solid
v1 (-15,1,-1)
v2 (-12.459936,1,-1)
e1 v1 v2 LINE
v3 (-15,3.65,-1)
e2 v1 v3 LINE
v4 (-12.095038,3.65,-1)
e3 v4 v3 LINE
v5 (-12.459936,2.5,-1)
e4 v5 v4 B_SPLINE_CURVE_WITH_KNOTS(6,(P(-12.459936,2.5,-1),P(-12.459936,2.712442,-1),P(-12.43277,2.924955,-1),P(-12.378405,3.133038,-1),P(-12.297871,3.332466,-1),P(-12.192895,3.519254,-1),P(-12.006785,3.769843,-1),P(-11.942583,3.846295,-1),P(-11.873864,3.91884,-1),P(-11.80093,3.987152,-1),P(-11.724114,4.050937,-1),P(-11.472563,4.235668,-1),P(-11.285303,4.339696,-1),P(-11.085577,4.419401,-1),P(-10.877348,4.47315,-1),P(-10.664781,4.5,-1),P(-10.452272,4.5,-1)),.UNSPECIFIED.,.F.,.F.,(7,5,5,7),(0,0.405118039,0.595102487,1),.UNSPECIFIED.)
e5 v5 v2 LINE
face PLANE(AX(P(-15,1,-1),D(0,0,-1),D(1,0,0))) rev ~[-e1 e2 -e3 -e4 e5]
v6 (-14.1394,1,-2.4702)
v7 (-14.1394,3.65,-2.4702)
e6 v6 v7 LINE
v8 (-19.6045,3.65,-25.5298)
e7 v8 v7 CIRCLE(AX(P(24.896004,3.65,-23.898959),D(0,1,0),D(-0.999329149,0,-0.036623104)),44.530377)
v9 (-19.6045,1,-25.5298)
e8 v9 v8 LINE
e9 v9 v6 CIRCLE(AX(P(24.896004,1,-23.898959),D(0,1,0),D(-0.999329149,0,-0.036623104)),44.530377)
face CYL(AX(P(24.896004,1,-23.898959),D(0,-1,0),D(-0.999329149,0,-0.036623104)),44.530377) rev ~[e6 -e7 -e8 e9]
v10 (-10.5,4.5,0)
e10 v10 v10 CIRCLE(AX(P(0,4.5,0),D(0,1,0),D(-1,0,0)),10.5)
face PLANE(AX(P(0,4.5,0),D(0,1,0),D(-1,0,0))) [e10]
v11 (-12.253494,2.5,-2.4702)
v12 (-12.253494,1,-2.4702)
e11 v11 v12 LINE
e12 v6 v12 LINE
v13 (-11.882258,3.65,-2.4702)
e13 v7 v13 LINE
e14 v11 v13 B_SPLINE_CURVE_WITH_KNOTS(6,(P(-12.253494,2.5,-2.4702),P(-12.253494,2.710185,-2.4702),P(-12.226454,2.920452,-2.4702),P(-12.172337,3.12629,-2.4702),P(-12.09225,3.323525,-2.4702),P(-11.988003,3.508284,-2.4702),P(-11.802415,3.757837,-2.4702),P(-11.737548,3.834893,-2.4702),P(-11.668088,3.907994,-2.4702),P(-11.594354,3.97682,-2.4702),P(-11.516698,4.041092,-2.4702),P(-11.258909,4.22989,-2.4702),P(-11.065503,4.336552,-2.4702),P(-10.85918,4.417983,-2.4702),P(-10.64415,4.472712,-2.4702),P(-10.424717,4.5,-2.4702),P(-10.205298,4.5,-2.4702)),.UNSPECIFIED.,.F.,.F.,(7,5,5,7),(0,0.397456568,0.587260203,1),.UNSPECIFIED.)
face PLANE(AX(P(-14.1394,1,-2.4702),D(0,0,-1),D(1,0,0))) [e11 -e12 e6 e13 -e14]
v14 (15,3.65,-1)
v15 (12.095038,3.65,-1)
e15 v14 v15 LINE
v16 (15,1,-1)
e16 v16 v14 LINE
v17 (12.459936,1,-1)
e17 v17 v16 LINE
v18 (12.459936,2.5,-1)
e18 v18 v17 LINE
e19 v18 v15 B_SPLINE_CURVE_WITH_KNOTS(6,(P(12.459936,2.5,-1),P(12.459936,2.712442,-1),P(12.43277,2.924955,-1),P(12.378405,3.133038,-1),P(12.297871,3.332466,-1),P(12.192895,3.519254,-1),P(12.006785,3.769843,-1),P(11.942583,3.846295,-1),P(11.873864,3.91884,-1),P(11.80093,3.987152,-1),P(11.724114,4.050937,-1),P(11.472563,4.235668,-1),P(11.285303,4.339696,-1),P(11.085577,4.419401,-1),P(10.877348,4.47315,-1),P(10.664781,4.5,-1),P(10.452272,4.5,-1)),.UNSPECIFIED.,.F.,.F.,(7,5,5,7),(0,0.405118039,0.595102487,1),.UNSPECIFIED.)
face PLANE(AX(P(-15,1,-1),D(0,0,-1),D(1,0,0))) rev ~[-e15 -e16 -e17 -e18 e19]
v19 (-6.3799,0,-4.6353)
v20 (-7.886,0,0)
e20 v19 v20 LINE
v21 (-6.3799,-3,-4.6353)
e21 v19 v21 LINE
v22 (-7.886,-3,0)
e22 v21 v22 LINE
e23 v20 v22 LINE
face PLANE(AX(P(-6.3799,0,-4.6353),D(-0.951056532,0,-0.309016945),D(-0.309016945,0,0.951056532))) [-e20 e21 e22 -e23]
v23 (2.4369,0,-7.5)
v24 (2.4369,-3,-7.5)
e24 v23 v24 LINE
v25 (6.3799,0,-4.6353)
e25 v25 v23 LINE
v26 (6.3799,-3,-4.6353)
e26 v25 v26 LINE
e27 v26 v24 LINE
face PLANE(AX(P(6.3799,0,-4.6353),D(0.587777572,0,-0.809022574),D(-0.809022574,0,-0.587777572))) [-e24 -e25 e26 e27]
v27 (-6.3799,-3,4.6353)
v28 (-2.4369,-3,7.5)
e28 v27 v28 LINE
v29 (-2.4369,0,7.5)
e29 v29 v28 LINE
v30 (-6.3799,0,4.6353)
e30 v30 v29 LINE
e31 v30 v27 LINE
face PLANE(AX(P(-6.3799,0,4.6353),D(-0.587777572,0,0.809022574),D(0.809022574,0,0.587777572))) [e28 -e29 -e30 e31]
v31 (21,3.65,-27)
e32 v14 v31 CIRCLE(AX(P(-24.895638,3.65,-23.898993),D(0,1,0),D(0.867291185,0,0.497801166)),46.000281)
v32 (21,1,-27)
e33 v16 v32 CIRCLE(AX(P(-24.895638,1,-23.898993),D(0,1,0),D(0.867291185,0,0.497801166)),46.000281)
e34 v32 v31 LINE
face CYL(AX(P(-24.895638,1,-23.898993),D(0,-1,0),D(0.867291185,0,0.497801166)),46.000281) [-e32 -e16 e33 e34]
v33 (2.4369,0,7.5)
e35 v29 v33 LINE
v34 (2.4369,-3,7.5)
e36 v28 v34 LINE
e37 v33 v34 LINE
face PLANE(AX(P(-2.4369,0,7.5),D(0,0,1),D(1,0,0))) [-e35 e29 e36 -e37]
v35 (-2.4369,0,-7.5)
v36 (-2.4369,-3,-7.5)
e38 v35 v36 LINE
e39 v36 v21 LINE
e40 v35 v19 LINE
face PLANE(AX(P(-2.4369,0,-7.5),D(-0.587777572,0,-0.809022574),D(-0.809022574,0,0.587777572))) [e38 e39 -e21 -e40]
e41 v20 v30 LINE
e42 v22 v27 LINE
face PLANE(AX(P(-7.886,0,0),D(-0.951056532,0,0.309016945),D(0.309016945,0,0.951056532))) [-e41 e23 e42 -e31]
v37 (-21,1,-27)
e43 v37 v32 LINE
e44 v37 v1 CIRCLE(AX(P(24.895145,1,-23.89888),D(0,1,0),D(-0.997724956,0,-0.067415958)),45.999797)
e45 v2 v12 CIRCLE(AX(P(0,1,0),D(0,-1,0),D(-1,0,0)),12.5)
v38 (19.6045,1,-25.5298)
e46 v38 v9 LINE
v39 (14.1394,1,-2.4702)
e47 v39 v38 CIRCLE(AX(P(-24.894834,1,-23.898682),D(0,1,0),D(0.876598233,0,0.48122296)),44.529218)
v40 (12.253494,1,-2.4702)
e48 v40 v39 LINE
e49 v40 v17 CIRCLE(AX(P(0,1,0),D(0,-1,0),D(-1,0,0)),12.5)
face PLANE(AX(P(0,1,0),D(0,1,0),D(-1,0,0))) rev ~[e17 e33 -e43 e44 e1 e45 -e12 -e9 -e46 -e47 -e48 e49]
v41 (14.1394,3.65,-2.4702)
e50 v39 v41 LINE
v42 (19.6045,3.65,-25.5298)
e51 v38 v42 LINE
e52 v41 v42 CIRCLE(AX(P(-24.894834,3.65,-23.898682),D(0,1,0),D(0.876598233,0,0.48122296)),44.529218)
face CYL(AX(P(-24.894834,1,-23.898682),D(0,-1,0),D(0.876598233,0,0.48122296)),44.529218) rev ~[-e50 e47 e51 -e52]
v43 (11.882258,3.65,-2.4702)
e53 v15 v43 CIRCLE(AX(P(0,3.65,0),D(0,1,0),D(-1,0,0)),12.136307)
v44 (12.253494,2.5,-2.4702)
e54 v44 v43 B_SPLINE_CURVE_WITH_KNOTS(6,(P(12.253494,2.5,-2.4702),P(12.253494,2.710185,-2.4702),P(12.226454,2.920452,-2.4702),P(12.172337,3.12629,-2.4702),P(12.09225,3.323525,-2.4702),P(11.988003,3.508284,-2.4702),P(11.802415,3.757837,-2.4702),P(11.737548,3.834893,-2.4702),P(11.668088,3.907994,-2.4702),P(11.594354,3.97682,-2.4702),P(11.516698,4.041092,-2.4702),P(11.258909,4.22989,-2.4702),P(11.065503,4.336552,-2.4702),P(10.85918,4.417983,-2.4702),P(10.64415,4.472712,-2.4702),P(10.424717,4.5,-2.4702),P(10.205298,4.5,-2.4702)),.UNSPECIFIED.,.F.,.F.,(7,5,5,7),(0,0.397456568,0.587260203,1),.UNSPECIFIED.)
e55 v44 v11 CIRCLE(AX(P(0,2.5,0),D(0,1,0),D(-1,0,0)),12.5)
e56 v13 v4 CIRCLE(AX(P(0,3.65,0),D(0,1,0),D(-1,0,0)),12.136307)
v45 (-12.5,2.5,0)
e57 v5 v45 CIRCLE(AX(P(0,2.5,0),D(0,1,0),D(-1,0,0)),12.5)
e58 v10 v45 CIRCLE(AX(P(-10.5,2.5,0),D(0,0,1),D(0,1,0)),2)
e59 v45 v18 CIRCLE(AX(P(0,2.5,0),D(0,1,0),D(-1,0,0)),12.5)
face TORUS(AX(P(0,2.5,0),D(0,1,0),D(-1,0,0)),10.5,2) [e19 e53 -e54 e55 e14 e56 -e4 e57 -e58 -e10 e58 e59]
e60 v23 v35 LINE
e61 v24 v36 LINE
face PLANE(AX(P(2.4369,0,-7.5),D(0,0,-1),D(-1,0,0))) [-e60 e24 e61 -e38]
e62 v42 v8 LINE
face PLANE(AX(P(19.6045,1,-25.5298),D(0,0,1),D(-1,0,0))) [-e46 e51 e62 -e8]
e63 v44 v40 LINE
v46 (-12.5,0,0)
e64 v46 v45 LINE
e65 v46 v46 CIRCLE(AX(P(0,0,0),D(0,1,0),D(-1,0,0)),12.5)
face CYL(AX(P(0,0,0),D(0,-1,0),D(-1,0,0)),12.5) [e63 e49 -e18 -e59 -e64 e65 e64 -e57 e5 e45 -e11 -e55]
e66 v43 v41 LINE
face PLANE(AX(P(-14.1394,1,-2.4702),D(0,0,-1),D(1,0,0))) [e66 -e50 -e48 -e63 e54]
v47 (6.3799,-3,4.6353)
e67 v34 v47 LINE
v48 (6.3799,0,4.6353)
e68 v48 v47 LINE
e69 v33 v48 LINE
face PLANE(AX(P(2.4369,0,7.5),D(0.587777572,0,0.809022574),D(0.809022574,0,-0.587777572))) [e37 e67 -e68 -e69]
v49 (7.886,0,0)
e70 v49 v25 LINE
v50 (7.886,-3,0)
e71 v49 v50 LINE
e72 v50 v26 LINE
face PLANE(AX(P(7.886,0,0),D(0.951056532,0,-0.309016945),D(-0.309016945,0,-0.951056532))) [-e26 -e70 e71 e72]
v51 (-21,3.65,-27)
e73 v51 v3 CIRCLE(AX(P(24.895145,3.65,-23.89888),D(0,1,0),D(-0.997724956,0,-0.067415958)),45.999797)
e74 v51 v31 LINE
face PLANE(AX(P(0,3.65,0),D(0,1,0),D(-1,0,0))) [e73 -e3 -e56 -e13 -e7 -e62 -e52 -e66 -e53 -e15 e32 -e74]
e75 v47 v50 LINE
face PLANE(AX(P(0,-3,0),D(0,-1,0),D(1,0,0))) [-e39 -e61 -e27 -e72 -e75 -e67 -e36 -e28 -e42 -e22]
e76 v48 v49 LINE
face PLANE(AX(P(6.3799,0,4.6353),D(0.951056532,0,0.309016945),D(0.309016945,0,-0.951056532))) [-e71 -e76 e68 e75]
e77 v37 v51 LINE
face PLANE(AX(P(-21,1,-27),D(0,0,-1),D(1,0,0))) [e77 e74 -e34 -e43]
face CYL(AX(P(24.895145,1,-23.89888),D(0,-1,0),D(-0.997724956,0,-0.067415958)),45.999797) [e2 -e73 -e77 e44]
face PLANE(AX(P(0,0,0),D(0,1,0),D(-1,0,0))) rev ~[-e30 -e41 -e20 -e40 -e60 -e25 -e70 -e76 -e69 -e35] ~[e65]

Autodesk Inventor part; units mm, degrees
ref_plane "YZ Plane" through (0, 0, 0) normal (1, 0, 0) x (0, 1, 0)
ref_plane "XY Plane" through (0, 0, 0) normal (0, 0, 1) x (1, 0, 0)
sketch "Sketch1" plane through (0, 0, 0) normal (0, 1, 0) x (-1, 0, 0)
  circle A0 centre (0, 0) radius 12.5
  dimension "d0" = 25
extrude "Extrusion1" add sketch "Sketch1" along normal blind 4.5
ref_plane "Work Plane1" through (0, 1, 0) normal (0, 1, 0) x (-1, 0, 0)
sketch "Sketch2" plane through (0, 1, 0) normal (0, 1, 0) x (-1, 0, 0)
  line L0 (15, -1) -> (-15, -1)
  arc A0 (21, -27) -> (15, -1) centre (-24.8954, -23.8989) ccw
  line L1 (21, -27) -> (-21, -27)
  arc A1 (-15, -1) -> (-21, -27) centre (24.8954, -23.8989) ccw
  line L2 (-19.6045, -25.5298) -> (19.6045, -25.5298)
  arc A2 (19.6045, -25.5298) -> (14.1394, -2.4702) centre (-24.8954, -23.8989) ccw
  line L3 (14.1394, -2.4702) -> (-14.1394, -2.4702)
  arc A3 (-14.1394, -2.4702) -> (-19.6045, -25.5298) centre (24.8954, -23.8989) ccw
  point P0 (0, -1)
  point P1 (0, -27)
  dimension "d5" = 30
  dimension "d6" = 26
  dimension "d7" = 42
  dimension "d8" = 46
  dimension "d9" = 46
extrude "Extrusion2" add sketch "Sketch2" along normal blind 2.65
fillet "Fillet1" radius 2 1 edges at (12.5, 4.5, 0)
sketch "Sketch3" plane through (0, 0, 0) normal (0, -1, 0) x (1, 0, 0)
  line L0 (-7.886, 0) -> (-6.3799, 4.6353)
  line L1 (-6.3799, 4.6353) -> (-2.4369, 7.5)
  line L2 (-2.4369, 7.5) -> (2.4369, 7.5)
  line L3 (2.4369, 7.5) -> (6.3799, 4.6353)
  line L4 (6.3799, 4.6353) -> (7.886, 0)
  line L5 (7.886, 0) -> (6.3799, -4.6353)
  line L6 (6.3799, -4.6353) -> (2.4369, -7.5)
  line L7 (2.4369, -7.5) -> (-2.4369, -7.5)
  line L8 (-2.4369, -7.5) -> (-6.3799, -4.6353)
  line L9 (-6.3799, -4.6353) -> (-7.886, 0)
  point P0 (0, 0)
  point P1 (0, 0)
  point P2 (0, -7.5)
  dimension "d13" = 15
extrude "Extrusion3" add sketch "Sketch3" along normal blind 3
properties part number "brace_tabs_half"
